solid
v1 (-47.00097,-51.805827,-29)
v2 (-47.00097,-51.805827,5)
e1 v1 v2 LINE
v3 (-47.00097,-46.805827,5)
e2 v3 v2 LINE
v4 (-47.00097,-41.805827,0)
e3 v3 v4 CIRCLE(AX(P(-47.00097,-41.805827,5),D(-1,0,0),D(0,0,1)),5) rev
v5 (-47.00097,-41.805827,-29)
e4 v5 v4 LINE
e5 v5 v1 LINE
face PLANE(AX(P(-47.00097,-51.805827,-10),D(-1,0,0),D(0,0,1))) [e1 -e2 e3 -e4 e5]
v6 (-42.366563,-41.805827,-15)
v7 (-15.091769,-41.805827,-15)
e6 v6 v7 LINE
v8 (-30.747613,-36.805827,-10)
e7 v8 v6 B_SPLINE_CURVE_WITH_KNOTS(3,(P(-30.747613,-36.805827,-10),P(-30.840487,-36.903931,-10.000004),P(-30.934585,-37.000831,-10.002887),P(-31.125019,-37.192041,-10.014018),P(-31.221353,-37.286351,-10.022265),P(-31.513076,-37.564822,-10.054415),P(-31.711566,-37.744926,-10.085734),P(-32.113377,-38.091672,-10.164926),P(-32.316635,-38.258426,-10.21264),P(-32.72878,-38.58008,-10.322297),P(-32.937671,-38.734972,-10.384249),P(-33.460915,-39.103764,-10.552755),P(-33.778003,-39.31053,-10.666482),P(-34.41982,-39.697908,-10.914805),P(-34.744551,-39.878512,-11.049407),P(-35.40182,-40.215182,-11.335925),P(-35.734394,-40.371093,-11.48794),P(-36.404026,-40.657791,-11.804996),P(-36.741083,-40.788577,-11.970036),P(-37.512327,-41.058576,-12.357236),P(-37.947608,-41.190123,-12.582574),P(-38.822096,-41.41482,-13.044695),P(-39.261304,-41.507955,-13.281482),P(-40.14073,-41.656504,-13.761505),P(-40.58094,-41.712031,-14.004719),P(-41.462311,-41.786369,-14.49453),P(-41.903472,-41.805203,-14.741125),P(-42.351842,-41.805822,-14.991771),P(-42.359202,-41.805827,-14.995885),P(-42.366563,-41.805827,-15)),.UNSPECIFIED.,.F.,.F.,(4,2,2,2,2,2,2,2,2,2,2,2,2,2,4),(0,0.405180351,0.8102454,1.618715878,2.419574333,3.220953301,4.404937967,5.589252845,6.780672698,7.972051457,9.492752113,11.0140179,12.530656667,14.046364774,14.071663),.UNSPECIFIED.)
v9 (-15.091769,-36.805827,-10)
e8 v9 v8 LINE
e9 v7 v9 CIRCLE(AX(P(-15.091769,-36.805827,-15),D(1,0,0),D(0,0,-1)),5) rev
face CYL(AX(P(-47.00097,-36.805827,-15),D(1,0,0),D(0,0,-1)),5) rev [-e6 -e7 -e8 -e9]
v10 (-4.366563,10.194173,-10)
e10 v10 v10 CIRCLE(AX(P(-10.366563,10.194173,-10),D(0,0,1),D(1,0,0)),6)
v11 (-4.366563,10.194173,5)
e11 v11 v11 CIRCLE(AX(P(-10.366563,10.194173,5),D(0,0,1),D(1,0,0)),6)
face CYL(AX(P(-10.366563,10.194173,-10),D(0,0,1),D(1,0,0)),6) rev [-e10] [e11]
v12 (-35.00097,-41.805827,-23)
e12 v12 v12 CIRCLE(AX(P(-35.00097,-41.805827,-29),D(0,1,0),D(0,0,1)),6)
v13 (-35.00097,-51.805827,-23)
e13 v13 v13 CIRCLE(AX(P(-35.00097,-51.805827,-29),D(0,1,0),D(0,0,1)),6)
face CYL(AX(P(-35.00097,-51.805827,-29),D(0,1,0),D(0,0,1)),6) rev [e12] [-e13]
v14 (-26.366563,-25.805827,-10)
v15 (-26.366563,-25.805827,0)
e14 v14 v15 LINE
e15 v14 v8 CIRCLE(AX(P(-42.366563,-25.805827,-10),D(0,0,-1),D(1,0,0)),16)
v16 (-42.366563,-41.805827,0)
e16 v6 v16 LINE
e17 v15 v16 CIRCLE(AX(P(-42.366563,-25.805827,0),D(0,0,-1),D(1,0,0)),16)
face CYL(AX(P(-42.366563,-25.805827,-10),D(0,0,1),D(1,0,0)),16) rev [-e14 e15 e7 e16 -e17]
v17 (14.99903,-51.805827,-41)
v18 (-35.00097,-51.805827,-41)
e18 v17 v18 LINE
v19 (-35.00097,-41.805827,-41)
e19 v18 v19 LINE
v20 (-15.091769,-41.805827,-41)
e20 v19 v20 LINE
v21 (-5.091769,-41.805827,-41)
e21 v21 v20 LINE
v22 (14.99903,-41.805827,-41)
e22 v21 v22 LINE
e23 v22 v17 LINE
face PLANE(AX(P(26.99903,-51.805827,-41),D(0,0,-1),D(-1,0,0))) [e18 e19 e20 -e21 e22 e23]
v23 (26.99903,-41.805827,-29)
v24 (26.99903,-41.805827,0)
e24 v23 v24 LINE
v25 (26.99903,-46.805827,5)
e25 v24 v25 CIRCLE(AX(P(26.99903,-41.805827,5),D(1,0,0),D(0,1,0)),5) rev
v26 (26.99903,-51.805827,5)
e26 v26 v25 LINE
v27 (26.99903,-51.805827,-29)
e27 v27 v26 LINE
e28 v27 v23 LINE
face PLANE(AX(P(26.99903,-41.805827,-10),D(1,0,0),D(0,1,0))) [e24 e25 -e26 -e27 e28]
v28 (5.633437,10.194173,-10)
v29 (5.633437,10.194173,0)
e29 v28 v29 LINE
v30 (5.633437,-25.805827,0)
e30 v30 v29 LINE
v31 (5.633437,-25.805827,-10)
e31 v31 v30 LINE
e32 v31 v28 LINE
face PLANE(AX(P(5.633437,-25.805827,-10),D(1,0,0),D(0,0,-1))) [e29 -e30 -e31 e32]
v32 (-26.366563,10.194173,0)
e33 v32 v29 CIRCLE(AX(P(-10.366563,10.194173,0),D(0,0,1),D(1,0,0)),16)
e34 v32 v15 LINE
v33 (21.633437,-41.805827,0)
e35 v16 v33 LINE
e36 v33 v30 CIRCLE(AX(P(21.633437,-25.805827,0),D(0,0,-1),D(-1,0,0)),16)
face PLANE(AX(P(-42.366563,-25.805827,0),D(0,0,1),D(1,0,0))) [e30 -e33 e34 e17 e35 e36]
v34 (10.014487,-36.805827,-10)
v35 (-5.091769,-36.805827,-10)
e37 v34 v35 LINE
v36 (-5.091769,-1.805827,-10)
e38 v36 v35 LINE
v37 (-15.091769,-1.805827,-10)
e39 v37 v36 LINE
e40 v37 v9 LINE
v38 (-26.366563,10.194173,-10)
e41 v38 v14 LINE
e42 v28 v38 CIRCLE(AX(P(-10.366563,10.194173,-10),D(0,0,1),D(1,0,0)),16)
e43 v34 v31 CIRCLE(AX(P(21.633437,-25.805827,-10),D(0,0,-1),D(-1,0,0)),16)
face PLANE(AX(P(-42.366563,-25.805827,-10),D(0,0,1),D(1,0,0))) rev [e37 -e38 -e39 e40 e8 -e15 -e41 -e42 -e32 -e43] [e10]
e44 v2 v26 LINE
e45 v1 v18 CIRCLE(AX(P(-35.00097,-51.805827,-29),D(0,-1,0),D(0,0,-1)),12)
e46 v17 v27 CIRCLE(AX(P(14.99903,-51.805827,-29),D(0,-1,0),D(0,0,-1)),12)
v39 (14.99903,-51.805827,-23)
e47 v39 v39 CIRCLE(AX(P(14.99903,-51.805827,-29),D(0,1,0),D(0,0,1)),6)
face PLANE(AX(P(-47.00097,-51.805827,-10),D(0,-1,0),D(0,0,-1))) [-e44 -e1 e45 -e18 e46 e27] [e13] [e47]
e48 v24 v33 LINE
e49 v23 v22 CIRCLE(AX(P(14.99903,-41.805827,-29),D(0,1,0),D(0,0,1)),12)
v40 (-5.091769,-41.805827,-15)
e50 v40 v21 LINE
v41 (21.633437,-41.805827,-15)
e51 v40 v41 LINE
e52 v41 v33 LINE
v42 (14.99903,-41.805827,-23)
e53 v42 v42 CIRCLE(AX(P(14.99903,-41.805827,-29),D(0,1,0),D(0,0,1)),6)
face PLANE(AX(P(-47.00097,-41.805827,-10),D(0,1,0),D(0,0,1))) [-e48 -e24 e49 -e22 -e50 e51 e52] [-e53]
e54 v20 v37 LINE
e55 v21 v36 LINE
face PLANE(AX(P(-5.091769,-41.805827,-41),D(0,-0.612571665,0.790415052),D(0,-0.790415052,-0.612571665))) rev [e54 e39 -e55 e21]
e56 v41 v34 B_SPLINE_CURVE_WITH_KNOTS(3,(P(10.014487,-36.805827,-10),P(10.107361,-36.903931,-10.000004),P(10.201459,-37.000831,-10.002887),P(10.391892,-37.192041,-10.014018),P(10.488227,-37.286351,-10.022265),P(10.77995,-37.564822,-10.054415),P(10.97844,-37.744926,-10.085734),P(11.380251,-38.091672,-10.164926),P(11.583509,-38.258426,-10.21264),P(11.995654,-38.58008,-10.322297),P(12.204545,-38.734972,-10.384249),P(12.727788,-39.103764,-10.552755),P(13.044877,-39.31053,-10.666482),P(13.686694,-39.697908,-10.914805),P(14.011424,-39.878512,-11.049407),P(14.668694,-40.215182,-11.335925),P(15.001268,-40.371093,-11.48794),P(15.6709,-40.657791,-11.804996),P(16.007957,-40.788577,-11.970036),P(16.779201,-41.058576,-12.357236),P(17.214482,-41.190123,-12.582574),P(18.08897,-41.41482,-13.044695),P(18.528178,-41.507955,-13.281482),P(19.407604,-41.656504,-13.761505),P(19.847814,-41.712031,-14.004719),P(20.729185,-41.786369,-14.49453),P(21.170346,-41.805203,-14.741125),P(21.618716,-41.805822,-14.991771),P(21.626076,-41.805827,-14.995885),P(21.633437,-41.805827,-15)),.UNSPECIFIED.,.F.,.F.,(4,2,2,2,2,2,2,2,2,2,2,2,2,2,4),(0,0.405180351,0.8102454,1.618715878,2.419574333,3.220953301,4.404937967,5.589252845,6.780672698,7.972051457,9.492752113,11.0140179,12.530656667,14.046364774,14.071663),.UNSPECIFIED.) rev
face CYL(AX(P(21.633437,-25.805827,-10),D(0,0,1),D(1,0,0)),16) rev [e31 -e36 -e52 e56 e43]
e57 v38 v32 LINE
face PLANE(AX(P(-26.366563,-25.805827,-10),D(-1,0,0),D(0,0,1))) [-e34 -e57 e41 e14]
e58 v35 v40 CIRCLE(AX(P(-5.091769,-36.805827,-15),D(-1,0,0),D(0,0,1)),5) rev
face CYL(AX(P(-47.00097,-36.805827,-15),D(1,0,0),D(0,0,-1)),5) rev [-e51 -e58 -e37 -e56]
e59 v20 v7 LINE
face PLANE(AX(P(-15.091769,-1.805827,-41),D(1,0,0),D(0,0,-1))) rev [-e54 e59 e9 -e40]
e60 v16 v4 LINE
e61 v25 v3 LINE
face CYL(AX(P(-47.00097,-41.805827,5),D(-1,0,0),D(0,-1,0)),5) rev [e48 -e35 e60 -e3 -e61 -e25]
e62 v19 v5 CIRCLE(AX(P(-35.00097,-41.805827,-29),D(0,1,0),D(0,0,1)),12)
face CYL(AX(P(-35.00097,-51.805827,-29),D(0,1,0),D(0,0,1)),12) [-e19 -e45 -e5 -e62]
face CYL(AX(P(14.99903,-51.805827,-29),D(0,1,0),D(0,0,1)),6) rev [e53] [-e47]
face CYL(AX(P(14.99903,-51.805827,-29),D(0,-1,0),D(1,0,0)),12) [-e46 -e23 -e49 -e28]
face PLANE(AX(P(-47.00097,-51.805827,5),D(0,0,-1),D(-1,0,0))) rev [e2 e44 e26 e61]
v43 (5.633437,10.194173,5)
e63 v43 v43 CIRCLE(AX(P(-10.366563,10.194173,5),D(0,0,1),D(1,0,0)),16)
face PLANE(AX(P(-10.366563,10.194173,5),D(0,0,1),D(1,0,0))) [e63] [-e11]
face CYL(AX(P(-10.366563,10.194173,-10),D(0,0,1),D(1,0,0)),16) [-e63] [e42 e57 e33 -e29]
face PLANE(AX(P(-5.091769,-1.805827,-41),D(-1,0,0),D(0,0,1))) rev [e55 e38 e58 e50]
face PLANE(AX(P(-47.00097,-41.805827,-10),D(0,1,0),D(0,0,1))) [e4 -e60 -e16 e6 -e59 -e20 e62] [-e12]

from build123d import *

# Parameters (mm, degrees)
SKETCH1_R            = 6
BOSS_EXTRUDE1_DEPTH  = 10
BOSS_EXTRUDE3_START  = 5
SKETCH2_R            = 16
SKETCH2_R_2          = 6
BOSS_EXTRUDE3_DEPTH  = 5
SKETCH3_W            = 74
SKETCH3_H            = 5
BOSS_EXTRUDE5_DEPTH  = 5
FILLET4_R            = 5
SKETCH5_W            = 74
SKETCH5_H            = 10
BOSS_EXTRUDE8_DEPTH  = 31
BOSS_EXTRUDE10_DEPTH = 40
CUT_EXTRUDE1_DEPTH   = 10
FILLET5_R            = 5
FILLET6_R            = 5
FILLET7_R            = 12
FILLET8_R            = 12
SKETCH16_R           = 6
CUT_EXTRUDE2_DEPTH   = 10
SKETCH17_R           = 6
CUT_EXTRUDE3_DEPTH   = 10


with BuildPart() as part:
    # Sketch1 → Boss-Extrude1 (new body)
    with BuildSketch(Plane.XY):
        with BuildLine():
            Line((-47.000970423, -51.805827164), (26.999029577, -51.805827164))
            Line((26.999029577, -51.805827164), (26.999029577, -41.805827164))
            Line((26.999029577, -41.805827164), (21.633436879, -41.805827164))
            ThreePointArc((21.633436879, -41.805827164), (10.31972838, -37.119535663), (5.633436879, -25.805827164))
            Line((5.633436879, -25.805827164), (5.633436879, 10.194172836))
            ThreePointArc((5.633436879, 10.194172836), (-10.366563121, 26.194172836), (-26.366563121, 10.194172836))
            Line((-26.366563121, 10.194172836), (-26.366563121, -25.805827164))
            ThreePointArc((-26.366563121, -25.805827164), (-31.052854622, -37.119535663), (-42.366563121, -41.805827164))
            Line((-42.366563121, -41.805827164), (-47.000970423, -41.805827164))
            Line((-47.000970423, -41.805827164), (-47.000970423, -51.805827164))
        make_face()
        with Locations((-10.366563121, 10.194172836)):
            Circle(SKETCH1_R, mode=Mode.SUBTRACT)
    extrude(amount=-BOSS_EXTRUDE1_DEPTH)

    # Sketch2 → Boss-Extrude3 (add)
    with BuildSketch(Plane.XY.offset(BOSS_EXTRUDE3_START)):
        with Locations((-10.366563121, 10.194172836)):
            Circle(SKETCH2_R)
        with Locations((-10.366563121, 10.194172836)):
            Circle(SKETCH2_R_2, mode=Mode.SUBTRACT)
    extrude(amount=-BOSS_EXTRUDE3_DEPTH)

    # Sketch3 → Boss-Extrude5 (add)
    with BuildSketch(Plane.XY):
        with Locations((-10.000970423, -49.305827164)):
            Rectangle(SKETCH3_W, SKETCH3_H)
    extrude(amount=BOSS_EXTRUDE5_DEPTH)

    # Fillet4
    fillet4_edges = [part.edges().sort_by_distance(p)[0] for p in [
        (-10.000970423, -46.805827164, 0),
    ]]
    fillet(fillet4_edges, radius=FILLET4_R - 0.0001)  # a hair under: the kernel refuses the full size

    # Sketch5 → Boss-Extrude8 (add)
    with BuildSketch(Plane(origin=(0, 0, -10), x_dir=(-1, 0, 0), z_dir=(0, 0, -1))):
        with Locations((10.000970423, -46.805827164)):
            Rectangle(SKETCH5_W, SKETCH5_H)
    extrude(amount=BOSS_EXTRUDE8_DEPTH)

    # Sketch13 → Boss-Extrude10 (add)
    with BuildSketch(Plane(origin=(0, -41.805827164, 0), x_dir=(1, 0, 0), z_dir=(0, 1, 0))):
        Polygon((-10.091769113, 41), (-15.091769113, 41), (-15.091769113, 10), (-5.091769113, 10), (-5.091769113, 41), align=None)
    extrude(amount=BOSS_EXTRUDE10_DEPTH)

    # Sketch14 → Cut-Extrude1 (cut)
    with BuildSketch(Plane.ZY.offset(15.091769113)):
        Polygon((-41, -41.805827164), (-10, -1.805827164), (-41, -1.805827164), align=None)
    extrude(amount=-CUT_EXTRUDE1_DEPTH, mode=Mode.SUBTRACT)

    # Fillet5
    fillet5_edges = [part.edges().sort_by_distance(p)[0] for p in [
        (-28.729166117, -41.805827164, -10),
    ]]
    fillet(fillet5_edges, radius=FILLET5_R)

    # Fillet6
    fillet6_edges = [part.edges().sort_by_distance(p)[0] for p in [
        (8.270833883, -41.805827164, -10),
    ]]
    fillet(fillet6_edges, radius=FILLET6_R)

    # Fillet7
    fillet7_edges = [part.edges().sort_by_distance(p)[0] for p in [
        (26.999029577, -46.805827164, -41),
    ]]
    fillet(fillet7_edges, radius=FILLET7_R)

    # Fillet8
    fillet8_edges = [part.edges().sort_by_distance(p)[0] for p in [
        (-47.000970423, -46.805827164, -41),
    ]]
    fillet(fillet8_edges, radius=FILLET8_R)

    # Sketch16 → Cut-Extrude2 (cut)
    with BuildSketch(Plane(origin=(0, -41.805827164, 0), x_dir=(1, 0, 0), z_dir=(0, 1, 0))):
        with Locations(Location((14.999029577, 29, 0), (0, 0, 270))):
            Circle(SKETCH16_R)
    extrude(amount=-CUT_EXTRUDE2_DEPTH, mode=Mode.SUBTRACT)

    # Sketch17 → Cut-Extrude3 (cut)
    with BuildSketch(Plane(origin=(0, -41.805827164, 0), x_dir=(1, 0, 0), z_dir=(0, 1, 0))):
        with Locations(Location((-35.000970423, 29, 0), (0, 0, 270))):
            Circle(SKETCH17_R)
    extrude(amount=-CUT_EXTRUDE3_DEPTH, mode=Mode.SUBTRACT)


solid = part.part
